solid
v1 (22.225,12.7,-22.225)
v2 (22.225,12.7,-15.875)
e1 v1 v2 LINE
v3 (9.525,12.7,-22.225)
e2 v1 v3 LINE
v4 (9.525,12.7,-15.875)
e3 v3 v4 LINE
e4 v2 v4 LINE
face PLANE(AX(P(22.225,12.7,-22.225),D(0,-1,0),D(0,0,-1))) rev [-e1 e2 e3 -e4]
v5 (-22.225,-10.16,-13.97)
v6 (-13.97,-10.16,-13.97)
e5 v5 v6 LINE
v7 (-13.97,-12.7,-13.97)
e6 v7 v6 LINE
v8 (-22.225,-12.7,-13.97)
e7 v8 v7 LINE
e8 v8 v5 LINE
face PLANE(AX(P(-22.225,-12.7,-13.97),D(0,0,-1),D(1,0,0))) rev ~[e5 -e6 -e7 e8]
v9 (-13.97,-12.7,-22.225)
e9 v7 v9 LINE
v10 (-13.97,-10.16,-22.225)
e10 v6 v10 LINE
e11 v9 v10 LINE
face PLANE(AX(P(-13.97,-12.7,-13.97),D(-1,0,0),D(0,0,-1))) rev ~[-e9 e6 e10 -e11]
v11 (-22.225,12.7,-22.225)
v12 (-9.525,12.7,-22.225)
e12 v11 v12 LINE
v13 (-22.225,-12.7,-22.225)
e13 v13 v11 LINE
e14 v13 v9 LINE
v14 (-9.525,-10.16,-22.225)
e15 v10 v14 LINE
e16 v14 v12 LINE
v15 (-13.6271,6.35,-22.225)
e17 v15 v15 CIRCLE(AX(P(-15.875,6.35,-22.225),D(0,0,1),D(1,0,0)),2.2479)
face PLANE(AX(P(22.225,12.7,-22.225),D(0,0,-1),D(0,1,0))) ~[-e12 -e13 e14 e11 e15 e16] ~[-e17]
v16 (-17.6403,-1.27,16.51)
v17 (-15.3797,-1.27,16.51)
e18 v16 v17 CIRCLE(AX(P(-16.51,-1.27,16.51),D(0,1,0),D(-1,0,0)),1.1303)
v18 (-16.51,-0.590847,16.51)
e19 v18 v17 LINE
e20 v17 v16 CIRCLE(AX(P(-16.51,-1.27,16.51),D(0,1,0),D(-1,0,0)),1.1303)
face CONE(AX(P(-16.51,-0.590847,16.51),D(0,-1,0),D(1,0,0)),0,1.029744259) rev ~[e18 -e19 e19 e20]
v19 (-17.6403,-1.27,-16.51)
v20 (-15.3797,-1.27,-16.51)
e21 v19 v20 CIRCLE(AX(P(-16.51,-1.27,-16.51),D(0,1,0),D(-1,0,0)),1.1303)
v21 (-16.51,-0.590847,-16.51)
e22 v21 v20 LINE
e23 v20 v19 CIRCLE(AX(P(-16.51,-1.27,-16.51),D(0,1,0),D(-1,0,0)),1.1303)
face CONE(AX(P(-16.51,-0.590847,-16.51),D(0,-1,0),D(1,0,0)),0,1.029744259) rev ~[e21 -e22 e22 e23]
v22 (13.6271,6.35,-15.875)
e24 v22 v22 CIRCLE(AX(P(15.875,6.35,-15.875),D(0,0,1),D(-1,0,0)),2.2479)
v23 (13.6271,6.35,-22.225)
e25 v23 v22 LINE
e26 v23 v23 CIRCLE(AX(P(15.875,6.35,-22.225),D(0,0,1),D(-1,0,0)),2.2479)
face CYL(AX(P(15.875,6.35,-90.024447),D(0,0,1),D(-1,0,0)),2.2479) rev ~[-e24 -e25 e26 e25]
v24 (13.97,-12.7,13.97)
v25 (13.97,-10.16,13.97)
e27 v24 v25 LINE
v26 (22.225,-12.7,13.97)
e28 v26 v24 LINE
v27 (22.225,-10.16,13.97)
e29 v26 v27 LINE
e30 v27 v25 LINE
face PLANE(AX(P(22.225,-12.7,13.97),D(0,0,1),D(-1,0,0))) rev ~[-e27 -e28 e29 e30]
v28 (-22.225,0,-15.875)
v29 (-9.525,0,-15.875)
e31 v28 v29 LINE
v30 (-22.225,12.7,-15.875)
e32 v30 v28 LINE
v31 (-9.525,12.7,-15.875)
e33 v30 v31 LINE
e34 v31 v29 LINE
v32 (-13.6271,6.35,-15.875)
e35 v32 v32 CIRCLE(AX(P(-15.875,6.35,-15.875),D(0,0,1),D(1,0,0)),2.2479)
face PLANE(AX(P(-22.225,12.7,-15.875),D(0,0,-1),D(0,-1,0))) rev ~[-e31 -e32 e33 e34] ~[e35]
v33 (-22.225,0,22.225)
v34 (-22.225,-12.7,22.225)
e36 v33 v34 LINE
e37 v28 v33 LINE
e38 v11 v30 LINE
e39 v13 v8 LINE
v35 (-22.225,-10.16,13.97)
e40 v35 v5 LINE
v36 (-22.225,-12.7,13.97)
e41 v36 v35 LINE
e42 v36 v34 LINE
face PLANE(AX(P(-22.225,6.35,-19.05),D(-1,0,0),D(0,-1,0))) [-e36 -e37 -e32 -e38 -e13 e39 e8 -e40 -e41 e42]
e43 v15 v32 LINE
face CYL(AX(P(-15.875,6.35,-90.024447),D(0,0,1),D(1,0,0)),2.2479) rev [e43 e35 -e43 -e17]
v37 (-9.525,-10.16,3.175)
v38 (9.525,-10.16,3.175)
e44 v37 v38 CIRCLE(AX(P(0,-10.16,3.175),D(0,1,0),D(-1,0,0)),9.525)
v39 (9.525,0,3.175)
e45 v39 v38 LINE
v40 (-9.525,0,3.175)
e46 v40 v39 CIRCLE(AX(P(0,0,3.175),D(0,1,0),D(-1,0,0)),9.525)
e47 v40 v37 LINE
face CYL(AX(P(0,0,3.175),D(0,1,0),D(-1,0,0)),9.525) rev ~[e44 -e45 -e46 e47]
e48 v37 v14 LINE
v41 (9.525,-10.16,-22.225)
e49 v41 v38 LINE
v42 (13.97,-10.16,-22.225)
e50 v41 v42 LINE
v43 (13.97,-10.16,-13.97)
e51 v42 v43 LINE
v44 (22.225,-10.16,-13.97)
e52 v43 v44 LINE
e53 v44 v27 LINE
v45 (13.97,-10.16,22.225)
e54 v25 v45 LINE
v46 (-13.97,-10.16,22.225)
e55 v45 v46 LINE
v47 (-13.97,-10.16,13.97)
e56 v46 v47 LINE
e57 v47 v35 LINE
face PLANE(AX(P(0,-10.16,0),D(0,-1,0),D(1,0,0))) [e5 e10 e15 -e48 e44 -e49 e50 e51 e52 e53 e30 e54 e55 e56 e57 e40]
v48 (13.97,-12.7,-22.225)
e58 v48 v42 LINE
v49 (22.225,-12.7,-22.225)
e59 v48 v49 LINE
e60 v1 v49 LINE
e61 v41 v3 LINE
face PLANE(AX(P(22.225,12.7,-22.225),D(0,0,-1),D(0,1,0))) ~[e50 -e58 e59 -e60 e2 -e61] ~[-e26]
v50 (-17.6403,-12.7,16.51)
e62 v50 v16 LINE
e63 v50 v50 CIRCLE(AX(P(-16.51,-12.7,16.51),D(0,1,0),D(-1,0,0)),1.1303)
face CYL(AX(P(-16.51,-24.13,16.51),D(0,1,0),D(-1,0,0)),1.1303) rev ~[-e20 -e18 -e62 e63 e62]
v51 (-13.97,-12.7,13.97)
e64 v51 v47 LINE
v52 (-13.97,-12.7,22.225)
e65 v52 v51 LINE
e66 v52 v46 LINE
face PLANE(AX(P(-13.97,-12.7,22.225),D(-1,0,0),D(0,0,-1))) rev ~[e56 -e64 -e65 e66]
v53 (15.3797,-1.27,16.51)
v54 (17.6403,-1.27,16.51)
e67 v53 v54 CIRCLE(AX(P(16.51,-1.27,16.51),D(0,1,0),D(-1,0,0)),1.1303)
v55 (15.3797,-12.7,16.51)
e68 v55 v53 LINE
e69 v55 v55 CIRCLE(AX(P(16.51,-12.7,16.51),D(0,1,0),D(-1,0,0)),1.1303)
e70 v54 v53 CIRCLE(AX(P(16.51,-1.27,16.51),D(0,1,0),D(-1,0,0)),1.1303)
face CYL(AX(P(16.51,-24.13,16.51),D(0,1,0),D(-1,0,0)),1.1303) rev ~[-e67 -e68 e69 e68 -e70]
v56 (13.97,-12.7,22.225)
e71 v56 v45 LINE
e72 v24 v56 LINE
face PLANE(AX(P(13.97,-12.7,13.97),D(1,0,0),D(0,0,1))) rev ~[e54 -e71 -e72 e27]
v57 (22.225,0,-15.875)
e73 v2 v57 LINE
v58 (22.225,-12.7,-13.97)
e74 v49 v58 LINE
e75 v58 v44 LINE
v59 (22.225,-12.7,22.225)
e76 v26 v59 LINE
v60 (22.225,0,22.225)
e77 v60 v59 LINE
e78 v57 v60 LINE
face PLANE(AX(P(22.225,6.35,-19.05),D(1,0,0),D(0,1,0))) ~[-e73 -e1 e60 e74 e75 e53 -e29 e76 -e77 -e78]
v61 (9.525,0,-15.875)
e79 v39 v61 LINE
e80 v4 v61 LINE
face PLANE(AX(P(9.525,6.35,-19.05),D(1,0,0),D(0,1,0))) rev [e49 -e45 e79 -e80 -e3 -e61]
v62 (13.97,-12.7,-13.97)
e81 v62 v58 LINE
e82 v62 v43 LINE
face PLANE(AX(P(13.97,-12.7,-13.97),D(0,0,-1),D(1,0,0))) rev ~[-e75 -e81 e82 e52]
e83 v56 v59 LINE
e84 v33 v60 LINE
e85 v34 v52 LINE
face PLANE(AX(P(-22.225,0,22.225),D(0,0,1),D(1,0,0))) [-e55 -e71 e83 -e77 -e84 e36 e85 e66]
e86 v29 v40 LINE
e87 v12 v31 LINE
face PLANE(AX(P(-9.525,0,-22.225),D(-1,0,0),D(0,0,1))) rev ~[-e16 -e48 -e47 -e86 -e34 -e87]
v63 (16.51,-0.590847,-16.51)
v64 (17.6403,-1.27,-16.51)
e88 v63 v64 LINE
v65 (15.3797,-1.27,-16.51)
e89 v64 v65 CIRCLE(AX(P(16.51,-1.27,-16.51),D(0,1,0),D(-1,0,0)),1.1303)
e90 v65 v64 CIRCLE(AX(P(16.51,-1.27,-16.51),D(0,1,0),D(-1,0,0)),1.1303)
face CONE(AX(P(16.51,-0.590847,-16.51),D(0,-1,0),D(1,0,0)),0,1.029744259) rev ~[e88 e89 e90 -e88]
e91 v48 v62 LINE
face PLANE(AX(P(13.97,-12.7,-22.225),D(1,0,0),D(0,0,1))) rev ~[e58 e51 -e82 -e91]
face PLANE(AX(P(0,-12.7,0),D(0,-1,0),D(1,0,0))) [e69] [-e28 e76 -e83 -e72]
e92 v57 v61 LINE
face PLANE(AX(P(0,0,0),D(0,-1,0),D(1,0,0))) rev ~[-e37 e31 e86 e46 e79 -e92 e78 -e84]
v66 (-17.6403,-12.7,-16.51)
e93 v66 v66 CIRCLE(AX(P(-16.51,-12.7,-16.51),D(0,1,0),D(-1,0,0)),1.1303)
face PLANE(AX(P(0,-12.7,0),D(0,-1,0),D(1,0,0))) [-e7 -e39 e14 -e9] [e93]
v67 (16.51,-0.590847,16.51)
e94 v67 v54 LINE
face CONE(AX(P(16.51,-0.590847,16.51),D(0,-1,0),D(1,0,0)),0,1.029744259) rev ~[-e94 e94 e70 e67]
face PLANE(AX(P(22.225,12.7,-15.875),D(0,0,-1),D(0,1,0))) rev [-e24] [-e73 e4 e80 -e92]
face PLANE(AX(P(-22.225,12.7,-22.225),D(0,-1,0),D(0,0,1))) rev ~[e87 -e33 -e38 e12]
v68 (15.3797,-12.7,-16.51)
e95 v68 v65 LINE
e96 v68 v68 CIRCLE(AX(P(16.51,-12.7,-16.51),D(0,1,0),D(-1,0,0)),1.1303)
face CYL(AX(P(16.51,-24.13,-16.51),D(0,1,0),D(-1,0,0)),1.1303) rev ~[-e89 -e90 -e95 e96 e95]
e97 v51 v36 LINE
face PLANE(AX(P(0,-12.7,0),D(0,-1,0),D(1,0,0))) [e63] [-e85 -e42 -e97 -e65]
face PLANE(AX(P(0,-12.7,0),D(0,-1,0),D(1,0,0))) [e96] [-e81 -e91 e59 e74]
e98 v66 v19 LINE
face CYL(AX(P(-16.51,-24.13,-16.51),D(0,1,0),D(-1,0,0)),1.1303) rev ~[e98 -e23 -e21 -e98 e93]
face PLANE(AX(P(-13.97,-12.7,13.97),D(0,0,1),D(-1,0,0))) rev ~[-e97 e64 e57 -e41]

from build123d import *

# Parameters (mm, degrees)
F0_W     = 44.45
F0_H     = 44.45
F1_DEPTH = 12.7
F2_W     = 12.7
F2_H     = 6.35
F3_DEPTH = 12.7
F5_DEPTH = 2.54
F6_D     = 2.2606
F6_DEPTH = 11.43
F6_TIP   = 0.6791527577
F9_DEPTH = 12.701
F10_D    = 4.4958


# Not quite as in the source:
# - a pattern or mirror of a feature is missing from the dataset's text; its kind, count and spacing are read off the source's solid


with BuildPart() as f1:
    # F0 (on Front) → F1 (new body)
    with BuildSketch(Plane.XZ):
        Rectangle(F0_W, F0_H)
    extrude(amount=F1_DEPTH)

    # F2 (on face) → F3 (join)
    with BuildSketch(Plane(origin=(-22.225, 0, 0), x_dir=(0, -1, 0), z_dir=(-1, 0, 0))):
        with Locations((-6.35, -19.05)):
            Rectangle(F2_W, F2_H)
    f3 = extrude(amount=-F3_DEPTH)

    # F3_copies: F3 across plane
    add(f3.mirror(Plane(origin=(0, 0, 0), x_dir=(0, 0, 1), z_dir=(1, 0, 0))))

    # F4 (on face) → F5 (cut)
    with BuildSketch(Plane.XZ.offset(12.7)):
        Polygon((-13.97, 13.97), (-22.225, 13.97), (-22.225, 0), (-22.225, -13.97), (-13.97, -13.97), (-13.97, -22.225), (0, -22.225), (13.97, -22.225), (13.97, -13.97), (22.225, -13.97), (22.225, 0), (22.225, 13.97), (13.97, 13.97), (13.97, 22.225), (0, 22.225), (-13.97, 22.225), align=None)
    extrude(amount=-F5_DEPTH, mode=Mode.SUBTRACT)

    # F6
    with Locations(Plane.XZ.offset(12.7)):
        with Locations((-16.51, 16.51), (16.51, 16.51), (16.51, -16.51), (-16.51, -16.51)):
            Hole(F6_D / 2, depth=F6_DEPTH)
            with Locations((0, 0, -(F6_DEPTH + F6_TIP / 2))):  # 118° drill point
                Cone(0, F6_D / 2, F6_TIP, mode=Mode.SUBTRACT)

    # F8 (on face) → F9 (cut, through all)
    with BuildSketch(Plane(origin=(0, 0, 0), x_dir=(-1, 0, 0), z_dir=(0, 1, 0))):
        with BuildLine():
            Line((-9.525, 3.175), (-9.525, -22.225))
            Line((-9.525, -22.225), (9.525, -22.225))
            Line((9.525, -22.225), (9.525, 3.175))
            ThreePointArc((9.525, 3.175), (0, 12.7), (-9.525, 3.175))
        make_face()
    extrude(amount=-F9_DEPTH, mode=Mode.SUBTRACT)

    # F10 (through all)
    with Locations(Plane(origin=(0, 0, -22.225), x_dir=(1, 0, 0), z_dir=(0, 0, -1))):
        with Locations((15.875, -6.35)):
            f10 = Hole(F10_D / 2)

    # F10_copies: F10 across plane
    add(f10.mirror(Plane(origin=(0, 0, 0), x_dir=(0, 0, -1), z_dir=(-1, 0, 0))), mode=Mode.SUBTRACT)


solid = f1.part
